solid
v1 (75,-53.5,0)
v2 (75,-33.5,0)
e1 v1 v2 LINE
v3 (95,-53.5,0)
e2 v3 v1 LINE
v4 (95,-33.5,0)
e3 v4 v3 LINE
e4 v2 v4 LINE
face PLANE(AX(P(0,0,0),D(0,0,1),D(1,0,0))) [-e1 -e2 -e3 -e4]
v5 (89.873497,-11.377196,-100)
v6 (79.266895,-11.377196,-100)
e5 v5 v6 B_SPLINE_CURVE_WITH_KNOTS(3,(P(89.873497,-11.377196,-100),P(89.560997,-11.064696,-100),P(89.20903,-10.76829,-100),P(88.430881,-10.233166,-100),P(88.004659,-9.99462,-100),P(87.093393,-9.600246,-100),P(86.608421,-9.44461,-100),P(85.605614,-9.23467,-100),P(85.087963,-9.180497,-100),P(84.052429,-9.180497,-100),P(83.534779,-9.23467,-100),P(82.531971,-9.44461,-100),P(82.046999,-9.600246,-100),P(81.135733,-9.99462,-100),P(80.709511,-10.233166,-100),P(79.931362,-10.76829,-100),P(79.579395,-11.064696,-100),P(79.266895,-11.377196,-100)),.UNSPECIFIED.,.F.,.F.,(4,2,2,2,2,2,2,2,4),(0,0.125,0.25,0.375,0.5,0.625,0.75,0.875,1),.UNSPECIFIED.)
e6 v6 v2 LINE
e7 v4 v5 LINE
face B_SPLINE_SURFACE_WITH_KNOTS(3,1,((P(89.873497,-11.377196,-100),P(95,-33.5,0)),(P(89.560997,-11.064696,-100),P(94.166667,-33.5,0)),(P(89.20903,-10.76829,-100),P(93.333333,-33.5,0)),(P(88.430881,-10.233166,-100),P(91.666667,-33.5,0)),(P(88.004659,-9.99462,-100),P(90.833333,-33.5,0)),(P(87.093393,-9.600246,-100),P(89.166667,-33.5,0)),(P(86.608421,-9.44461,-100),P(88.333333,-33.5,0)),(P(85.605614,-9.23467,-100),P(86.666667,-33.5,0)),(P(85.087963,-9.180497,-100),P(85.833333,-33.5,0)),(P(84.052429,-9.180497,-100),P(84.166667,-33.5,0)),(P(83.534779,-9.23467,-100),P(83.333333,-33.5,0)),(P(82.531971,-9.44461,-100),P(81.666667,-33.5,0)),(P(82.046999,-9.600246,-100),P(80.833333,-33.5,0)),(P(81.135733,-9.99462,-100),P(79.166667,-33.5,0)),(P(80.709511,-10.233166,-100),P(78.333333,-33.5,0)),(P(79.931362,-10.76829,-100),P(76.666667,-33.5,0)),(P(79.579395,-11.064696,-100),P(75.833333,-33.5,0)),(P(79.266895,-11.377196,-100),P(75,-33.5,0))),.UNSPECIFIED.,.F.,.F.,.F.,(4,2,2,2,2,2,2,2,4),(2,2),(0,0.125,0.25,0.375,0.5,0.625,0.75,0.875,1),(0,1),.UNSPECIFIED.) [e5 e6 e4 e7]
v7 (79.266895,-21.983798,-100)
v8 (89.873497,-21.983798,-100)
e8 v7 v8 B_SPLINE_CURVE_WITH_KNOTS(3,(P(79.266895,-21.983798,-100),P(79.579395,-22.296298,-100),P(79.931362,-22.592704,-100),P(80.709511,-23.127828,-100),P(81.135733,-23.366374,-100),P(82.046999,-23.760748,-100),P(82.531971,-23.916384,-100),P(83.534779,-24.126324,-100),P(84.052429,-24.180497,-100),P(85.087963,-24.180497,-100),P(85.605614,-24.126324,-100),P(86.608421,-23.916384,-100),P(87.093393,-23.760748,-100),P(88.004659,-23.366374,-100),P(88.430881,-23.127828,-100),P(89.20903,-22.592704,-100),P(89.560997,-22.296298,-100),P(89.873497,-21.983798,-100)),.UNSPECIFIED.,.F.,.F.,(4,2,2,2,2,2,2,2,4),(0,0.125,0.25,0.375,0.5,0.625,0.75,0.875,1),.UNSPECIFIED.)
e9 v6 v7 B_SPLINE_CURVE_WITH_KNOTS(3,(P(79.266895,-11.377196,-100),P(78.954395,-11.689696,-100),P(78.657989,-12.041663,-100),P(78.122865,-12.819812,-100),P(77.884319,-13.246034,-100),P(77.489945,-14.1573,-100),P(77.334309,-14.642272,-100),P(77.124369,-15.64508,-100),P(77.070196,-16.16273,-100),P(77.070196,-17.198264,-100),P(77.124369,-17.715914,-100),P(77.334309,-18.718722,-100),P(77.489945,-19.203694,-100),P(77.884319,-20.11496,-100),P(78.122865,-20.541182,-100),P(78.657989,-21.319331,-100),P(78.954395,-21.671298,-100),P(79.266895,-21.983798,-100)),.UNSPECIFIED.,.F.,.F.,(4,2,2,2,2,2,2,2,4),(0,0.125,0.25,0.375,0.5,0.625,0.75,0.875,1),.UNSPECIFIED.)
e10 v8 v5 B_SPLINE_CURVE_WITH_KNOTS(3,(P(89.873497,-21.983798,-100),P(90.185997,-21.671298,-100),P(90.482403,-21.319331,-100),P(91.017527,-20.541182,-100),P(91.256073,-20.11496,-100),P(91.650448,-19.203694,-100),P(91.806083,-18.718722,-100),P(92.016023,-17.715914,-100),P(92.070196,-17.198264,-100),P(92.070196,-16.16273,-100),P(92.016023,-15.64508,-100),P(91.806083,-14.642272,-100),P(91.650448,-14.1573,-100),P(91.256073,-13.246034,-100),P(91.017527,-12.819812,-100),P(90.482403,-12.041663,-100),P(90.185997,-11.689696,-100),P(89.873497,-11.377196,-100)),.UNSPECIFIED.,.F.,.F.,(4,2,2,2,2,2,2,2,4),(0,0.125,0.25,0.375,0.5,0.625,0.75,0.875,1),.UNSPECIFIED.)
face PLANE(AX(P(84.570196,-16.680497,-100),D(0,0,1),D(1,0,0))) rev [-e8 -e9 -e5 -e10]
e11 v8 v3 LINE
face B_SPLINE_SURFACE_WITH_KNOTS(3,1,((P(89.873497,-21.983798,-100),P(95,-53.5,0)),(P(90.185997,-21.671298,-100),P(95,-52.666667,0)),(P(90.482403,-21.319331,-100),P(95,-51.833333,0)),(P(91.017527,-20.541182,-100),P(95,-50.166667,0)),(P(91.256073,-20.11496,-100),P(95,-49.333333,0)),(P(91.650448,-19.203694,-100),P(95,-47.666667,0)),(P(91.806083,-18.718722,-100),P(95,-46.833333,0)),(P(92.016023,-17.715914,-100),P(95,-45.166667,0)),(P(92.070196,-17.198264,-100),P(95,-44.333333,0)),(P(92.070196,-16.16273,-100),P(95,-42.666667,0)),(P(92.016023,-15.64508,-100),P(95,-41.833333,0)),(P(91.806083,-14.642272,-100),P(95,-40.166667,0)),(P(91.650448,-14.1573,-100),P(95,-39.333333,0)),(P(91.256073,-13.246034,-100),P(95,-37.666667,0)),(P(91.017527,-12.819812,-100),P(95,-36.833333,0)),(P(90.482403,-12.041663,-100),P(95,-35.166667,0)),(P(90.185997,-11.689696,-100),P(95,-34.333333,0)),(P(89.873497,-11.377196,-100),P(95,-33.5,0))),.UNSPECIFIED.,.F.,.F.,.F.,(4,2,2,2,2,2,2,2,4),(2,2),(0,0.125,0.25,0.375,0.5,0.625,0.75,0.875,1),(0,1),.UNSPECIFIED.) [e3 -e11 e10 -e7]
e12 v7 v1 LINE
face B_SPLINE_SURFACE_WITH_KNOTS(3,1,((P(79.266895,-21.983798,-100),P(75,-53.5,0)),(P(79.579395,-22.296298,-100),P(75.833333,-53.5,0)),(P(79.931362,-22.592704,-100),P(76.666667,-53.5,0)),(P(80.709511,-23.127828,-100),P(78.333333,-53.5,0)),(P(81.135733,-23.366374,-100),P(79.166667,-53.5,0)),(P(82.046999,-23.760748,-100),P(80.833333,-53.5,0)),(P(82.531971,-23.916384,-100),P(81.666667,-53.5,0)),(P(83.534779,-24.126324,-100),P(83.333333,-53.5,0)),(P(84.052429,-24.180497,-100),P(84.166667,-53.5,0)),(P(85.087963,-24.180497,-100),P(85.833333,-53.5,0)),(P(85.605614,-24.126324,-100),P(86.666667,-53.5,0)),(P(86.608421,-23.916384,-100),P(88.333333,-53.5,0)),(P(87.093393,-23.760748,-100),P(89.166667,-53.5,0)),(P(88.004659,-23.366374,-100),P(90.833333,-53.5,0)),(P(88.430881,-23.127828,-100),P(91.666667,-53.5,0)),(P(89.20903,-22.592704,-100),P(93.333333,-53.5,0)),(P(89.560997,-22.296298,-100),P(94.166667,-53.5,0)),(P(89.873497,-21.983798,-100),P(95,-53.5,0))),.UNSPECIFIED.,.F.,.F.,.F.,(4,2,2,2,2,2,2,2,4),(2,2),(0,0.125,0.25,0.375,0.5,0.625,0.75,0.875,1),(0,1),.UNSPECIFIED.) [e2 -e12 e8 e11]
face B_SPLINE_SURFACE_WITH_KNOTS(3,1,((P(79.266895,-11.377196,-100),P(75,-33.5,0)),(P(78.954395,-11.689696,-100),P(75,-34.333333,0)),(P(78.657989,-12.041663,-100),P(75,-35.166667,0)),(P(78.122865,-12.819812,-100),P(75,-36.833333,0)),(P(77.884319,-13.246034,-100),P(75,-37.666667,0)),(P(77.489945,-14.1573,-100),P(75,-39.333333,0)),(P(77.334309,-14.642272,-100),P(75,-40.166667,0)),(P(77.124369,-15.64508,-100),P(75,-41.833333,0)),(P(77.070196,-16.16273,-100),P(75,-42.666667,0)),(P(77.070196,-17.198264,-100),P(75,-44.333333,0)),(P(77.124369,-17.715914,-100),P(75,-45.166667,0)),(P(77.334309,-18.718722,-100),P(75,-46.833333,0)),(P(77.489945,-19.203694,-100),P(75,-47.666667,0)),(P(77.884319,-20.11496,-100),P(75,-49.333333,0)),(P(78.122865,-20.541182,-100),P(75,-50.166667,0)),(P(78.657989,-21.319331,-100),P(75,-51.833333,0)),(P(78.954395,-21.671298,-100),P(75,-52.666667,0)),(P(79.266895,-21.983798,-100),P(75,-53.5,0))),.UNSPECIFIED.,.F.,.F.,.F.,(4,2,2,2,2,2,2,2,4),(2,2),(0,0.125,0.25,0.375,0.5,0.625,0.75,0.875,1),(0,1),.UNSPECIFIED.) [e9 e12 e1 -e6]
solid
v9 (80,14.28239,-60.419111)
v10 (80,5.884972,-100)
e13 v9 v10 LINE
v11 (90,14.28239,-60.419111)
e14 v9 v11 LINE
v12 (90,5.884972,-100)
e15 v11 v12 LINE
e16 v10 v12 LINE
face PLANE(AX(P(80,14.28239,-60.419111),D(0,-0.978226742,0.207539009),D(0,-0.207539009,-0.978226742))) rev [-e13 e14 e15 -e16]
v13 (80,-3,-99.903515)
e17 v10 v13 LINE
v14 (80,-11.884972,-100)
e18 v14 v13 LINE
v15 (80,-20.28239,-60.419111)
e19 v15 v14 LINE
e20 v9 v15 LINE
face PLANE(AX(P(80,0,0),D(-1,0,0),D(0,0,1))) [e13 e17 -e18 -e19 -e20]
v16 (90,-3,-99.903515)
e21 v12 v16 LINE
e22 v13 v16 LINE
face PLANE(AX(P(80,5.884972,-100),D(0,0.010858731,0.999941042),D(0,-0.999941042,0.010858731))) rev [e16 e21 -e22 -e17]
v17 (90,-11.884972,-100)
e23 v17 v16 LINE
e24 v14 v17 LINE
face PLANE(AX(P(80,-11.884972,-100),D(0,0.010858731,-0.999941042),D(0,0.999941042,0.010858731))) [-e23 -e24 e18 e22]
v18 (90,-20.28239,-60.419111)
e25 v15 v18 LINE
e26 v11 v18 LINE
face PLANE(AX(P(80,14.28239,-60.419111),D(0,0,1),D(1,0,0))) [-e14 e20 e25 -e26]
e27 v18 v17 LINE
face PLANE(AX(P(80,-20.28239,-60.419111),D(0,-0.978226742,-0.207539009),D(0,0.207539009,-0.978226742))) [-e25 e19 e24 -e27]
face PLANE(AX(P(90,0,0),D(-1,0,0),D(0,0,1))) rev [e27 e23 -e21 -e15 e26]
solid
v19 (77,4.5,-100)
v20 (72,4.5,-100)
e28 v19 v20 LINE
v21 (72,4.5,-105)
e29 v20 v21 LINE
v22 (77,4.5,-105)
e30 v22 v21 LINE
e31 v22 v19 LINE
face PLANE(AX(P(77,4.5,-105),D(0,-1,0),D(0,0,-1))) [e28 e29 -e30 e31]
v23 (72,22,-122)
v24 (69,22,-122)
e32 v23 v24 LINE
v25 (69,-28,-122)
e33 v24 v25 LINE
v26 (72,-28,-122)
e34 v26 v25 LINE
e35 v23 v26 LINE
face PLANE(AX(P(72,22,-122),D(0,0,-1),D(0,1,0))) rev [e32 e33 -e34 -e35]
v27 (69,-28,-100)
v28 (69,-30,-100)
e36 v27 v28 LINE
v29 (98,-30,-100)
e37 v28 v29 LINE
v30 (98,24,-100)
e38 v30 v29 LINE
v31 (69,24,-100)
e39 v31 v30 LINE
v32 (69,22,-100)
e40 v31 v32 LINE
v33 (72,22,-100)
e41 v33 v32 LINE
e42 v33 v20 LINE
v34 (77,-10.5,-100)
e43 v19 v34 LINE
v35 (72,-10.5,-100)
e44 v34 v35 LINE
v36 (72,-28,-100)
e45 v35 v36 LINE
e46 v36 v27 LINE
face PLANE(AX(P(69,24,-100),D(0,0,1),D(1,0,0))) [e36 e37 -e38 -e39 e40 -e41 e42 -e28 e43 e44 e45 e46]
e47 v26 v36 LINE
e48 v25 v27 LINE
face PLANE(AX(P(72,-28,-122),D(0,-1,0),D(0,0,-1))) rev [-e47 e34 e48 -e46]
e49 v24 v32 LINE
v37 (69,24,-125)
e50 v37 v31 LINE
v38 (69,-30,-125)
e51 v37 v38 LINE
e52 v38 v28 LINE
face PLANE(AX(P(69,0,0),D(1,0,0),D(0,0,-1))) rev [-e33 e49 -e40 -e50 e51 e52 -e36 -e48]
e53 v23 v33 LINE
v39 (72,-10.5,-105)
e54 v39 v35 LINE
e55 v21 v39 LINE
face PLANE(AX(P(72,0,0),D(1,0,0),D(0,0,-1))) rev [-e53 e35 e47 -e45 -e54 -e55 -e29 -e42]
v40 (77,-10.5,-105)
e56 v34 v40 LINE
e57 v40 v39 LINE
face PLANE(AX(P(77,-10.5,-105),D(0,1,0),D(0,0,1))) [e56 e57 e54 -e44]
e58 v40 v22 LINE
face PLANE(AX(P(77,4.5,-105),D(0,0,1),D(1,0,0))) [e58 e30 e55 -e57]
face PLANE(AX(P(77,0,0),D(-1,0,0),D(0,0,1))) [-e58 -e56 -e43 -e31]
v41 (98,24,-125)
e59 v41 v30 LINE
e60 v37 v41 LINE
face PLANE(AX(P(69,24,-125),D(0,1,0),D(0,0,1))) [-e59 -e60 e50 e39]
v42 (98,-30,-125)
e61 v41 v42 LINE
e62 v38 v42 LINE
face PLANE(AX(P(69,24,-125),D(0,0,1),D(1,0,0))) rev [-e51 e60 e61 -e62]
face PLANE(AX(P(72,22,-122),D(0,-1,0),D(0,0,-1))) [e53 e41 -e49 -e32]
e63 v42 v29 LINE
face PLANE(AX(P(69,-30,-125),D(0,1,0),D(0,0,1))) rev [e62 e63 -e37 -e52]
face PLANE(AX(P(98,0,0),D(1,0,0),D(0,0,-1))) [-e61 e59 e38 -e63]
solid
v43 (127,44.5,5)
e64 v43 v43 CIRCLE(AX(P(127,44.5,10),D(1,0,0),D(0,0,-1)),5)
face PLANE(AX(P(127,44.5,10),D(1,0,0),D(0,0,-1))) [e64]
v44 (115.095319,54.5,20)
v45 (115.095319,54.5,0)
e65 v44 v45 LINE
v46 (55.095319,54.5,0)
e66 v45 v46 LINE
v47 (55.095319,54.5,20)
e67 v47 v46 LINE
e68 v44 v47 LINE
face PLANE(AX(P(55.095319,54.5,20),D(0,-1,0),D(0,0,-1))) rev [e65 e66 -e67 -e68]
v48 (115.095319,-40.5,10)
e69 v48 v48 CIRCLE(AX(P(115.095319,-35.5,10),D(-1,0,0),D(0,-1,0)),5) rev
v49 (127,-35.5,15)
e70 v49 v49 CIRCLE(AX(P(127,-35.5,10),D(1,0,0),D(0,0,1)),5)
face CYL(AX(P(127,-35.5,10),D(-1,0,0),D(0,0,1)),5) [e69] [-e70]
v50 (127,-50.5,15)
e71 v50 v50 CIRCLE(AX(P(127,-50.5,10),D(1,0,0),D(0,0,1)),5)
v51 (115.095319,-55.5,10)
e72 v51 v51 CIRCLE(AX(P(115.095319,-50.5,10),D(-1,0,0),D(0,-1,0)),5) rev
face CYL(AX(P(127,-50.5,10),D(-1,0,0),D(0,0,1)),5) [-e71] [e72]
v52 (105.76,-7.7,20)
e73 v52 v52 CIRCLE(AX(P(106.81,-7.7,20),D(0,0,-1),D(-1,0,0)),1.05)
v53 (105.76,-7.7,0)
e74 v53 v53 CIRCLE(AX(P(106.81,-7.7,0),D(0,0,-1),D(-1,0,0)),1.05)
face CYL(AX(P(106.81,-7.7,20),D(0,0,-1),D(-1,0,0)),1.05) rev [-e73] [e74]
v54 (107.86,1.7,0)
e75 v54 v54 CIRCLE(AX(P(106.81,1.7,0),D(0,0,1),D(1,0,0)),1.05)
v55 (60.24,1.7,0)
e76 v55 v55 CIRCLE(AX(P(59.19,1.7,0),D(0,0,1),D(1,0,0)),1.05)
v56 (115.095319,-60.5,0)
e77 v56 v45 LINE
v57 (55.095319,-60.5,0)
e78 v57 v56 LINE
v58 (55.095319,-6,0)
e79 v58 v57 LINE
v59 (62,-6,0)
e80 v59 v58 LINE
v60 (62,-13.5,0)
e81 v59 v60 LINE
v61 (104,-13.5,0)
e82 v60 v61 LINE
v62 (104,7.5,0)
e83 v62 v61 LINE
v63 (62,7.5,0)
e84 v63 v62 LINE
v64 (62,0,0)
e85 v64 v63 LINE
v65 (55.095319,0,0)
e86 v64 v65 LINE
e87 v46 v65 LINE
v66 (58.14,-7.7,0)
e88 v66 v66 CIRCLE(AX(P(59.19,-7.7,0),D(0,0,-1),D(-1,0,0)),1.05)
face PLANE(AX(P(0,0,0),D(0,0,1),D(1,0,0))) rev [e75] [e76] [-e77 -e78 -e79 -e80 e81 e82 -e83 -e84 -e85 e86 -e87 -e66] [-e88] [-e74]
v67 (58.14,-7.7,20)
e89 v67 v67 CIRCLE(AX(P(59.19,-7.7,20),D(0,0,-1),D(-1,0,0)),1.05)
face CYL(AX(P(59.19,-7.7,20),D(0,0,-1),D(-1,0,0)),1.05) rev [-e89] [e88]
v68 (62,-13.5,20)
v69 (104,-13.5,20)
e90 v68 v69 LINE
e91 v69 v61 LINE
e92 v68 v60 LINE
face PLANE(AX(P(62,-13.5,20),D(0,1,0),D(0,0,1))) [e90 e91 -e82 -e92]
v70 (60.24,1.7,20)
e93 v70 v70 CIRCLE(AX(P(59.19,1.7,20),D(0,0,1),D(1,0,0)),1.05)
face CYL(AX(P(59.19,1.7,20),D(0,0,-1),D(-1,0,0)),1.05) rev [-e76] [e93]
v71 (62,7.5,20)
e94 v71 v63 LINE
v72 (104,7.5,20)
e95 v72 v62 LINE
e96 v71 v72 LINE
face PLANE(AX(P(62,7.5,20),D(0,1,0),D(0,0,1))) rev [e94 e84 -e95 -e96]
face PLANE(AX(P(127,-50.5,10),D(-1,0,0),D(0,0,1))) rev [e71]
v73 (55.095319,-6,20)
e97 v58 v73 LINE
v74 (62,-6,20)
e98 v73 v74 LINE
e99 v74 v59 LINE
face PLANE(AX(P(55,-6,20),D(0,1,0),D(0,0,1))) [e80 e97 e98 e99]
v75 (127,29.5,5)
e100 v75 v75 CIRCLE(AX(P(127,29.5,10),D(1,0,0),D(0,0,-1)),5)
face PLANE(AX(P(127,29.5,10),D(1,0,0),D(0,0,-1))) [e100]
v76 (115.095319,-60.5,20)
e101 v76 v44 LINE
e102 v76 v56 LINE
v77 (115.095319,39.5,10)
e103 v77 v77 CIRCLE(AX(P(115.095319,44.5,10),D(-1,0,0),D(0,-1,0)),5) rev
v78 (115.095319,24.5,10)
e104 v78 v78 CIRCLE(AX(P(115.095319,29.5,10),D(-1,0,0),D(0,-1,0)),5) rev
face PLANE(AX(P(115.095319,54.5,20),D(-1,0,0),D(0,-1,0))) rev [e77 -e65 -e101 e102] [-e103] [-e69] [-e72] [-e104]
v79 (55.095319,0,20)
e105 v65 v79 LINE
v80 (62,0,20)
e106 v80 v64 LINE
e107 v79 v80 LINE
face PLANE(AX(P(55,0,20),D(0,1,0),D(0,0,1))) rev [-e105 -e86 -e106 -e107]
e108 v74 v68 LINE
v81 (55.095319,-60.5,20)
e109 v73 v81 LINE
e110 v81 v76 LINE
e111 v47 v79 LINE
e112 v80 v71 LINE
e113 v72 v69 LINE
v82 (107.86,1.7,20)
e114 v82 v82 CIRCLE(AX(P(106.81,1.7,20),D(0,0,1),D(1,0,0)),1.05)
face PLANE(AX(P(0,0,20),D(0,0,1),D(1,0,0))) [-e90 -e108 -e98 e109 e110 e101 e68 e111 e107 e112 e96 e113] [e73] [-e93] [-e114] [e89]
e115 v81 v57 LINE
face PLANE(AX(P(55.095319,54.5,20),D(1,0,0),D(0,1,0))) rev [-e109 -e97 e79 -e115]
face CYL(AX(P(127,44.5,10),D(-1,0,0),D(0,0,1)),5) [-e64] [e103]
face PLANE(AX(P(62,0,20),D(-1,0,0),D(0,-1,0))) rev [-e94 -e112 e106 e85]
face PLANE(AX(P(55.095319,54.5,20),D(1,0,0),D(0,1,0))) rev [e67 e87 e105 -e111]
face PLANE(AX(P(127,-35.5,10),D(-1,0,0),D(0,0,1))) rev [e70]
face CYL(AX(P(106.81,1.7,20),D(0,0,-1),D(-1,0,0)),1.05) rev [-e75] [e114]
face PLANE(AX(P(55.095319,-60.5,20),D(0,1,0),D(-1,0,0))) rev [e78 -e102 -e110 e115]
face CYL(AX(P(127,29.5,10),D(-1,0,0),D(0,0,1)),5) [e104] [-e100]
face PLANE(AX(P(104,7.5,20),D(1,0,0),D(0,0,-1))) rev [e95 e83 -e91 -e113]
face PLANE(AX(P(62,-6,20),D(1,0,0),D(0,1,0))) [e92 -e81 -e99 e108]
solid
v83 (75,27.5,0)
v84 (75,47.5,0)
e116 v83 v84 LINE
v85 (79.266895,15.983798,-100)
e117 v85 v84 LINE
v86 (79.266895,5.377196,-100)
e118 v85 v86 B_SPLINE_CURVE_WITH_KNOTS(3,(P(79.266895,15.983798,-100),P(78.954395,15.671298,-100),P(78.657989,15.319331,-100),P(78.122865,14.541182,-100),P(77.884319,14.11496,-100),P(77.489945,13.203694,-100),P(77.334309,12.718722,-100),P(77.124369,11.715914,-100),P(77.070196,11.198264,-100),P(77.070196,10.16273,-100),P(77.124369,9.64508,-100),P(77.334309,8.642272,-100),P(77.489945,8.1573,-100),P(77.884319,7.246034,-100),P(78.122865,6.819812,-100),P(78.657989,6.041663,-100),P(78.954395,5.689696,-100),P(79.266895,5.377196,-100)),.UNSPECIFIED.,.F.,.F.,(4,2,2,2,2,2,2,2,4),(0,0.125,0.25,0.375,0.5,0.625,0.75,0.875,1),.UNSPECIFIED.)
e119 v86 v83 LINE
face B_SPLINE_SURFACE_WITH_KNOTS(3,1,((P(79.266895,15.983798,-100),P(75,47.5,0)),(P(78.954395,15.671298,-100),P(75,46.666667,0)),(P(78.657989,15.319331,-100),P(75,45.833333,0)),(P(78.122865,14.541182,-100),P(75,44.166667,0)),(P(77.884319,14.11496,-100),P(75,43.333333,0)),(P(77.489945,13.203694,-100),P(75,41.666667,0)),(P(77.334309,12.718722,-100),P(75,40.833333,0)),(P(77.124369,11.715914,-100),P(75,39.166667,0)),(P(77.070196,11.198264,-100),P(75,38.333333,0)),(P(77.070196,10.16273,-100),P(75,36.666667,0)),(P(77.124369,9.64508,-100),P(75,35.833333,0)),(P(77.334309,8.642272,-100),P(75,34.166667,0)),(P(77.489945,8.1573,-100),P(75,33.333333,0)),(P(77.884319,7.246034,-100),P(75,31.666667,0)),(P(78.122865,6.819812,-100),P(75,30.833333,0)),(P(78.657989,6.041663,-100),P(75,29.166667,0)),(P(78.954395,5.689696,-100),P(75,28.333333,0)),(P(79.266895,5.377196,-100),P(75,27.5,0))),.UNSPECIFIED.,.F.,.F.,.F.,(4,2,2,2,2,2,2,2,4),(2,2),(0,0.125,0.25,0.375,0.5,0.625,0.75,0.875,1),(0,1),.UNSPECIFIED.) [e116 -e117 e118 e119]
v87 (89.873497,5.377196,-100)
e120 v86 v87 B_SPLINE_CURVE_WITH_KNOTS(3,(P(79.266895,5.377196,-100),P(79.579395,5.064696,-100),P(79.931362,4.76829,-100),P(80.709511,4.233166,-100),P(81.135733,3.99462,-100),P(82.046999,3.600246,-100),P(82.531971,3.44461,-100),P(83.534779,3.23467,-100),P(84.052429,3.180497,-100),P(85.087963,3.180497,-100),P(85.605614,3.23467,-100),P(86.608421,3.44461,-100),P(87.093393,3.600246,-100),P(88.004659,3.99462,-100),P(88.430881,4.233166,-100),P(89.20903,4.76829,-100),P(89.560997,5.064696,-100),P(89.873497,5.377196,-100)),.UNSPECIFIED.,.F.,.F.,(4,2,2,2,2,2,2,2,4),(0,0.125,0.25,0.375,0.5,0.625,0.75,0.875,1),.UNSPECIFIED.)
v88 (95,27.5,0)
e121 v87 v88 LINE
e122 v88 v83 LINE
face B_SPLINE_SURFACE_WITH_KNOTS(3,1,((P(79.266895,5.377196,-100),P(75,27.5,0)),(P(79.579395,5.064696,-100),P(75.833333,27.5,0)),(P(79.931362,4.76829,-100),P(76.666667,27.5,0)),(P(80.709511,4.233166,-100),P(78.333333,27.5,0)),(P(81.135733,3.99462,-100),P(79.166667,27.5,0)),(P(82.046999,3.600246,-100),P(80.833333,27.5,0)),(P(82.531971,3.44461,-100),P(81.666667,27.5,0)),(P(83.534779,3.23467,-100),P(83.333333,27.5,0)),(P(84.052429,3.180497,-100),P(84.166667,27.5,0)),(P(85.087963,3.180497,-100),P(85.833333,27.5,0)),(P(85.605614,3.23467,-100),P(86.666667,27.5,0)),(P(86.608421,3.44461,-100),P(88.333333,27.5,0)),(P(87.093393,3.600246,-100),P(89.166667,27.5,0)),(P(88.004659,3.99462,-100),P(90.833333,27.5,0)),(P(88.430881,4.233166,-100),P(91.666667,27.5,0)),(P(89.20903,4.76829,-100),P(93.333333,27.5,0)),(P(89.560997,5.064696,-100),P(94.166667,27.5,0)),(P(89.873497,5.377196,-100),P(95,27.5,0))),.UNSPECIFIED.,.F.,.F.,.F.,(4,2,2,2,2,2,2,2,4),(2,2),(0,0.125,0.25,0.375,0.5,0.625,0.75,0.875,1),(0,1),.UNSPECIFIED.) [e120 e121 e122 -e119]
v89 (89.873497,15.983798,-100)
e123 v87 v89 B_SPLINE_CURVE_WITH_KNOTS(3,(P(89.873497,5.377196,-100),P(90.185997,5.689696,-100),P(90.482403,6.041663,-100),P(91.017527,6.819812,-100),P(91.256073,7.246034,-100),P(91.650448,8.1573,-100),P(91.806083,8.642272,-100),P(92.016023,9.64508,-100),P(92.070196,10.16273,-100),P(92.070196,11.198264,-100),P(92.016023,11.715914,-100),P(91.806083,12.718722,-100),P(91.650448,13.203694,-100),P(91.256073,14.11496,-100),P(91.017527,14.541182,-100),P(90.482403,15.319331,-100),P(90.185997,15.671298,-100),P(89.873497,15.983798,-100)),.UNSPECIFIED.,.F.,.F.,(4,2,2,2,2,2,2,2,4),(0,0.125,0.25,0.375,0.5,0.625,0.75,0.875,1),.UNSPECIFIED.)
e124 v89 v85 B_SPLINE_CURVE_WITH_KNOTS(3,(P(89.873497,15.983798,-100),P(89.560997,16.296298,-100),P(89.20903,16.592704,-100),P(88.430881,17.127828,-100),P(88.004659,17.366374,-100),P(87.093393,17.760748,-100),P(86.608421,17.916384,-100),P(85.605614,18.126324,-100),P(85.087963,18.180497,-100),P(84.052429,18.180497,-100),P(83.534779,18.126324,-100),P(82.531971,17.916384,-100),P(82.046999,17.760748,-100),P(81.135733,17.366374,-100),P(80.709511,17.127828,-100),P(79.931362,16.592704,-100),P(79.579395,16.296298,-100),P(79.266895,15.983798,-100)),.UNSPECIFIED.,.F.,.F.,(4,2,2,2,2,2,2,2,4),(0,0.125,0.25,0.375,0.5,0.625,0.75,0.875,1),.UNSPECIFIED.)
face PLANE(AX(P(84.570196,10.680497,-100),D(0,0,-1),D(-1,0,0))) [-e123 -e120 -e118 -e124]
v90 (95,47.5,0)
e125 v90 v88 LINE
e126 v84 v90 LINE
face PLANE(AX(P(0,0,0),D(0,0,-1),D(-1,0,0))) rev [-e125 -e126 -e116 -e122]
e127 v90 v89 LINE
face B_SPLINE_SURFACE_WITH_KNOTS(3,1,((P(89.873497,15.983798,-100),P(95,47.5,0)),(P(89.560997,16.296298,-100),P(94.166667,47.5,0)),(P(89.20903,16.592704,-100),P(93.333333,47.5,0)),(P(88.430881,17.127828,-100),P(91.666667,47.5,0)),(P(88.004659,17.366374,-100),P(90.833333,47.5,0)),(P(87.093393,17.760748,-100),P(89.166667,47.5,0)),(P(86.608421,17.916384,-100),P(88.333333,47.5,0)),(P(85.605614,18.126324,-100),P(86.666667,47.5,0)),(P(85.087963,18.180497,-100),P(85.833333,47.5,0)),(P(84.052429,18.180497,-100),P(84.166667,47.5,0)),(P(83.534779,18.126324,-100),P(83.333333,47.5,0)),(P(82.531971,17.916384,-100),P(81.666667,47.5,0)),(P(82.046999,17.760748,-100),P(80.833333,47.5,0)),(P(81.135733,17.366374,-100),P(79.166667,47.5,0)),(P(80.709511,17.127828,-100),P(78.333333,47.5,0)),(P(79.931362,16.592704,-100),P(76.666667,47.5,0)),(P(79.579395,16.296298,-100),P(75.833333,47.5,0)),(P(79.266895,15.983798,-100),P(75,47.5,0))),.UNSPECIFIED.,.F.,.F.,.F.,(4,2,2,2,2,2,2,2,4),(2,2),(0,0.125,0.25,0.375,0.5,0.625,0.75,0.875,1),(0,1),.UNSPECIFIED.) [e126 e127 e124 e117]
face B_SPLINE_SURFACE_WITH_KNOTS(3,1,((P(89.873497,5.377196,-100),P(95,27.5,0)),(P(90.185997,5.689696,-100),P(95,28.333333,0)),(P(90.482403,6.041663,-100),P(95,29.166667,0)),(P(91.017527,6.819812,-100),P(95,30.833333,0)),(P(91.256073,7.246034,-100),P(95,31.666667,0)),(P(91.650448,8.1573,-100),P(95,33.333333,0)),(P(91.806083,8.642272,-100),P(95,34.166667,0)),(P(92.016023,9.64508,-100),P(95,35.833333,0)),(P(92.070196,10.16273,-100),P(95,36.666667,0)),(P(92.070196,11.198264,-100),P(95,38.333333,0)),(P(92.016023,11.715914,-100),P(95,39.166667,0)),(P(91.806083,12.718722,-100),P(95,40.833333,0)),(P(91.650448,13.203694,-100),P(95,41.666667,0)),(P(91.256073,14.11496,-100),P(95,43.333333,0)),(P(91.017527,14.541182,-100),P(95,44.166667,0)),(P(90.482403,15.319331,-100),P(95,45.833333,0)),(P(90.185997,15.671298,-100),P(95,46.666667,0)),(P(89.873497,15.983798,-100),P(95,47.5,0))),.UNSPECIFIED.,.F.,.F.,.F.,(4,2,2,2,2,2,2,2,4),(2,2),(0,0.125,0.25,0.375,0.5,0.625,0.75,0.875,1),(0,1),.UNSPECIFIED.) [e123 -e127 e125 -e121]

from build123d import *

# Parameters (mm, degrees)
SKETCH_5_W            = 60
SKETCH_5_H            = 115
EXTRUDE_2_DEPTH       = 20
SKETCH_1_R            = 1.05
CUT_EXTRUDE_4_DEPTH   = 20
SKETCH_6_R            = 5
EXTRUDE_3_DEPTH       = 12
EXTRUDE_6_DEPTH       = 3
EXTRUDE_6_DEPTH_BACK  = 26
SKETCH_13_W           = 25
SKETCH_13_H           = 54
SKETCH_16_W           = 22
SKETCH_16_H           = 50
CUT_EXTRUDE_9_DEPTH   = 3
SKETCH_17_W           = 5
SKETCH_17_H           = 15
CUT_EXTRUDE_10_DEPTH  = 8
EXTRUDE_13_DEPTH      = 5
EXTRUDE_13_DEPTH_BACK = 5


with BuildPart() as part:
    # 草圖5 → 填料-伸長2 (new body)
    with BuildSketch(Plane.XY):
        with Locations((85.095319229, -3)):
            Rectangle(SKETCH_5_W, SKETCH_5_H)
    extrude(amount=EXTRUDE_2_DEPTH)

    # 草圖1 → 除料-伸長4 (cut)
    with BuildSketch(Plane.XY):
        with Locations((59.19, 1.7)):
            Circle(SKETCH_1_R)
        with Locations((106.81, 1.7)):
            Circle(SKETCH_1_R)
        with Locations(Location((106.81, -7.7, 0), (0, 0, 180))):
            Circle(SKETCH_1_R)
        with Locations(Location((59.19, -7.7, 0), (0, 0, 180))):
            Circle(SKETCH_1_R)
        Polygon((55, -3), (55, 0), (62, 0), (62, 7.5), (104, 7.5), (104, -13.5), (62, -13.5), (62, -6), (55, -6), align=None)
    extrude(amount=CUT_EXTRUDE_4_DEPTH, mode=Mode.SUBTRACT)

    # 草圖6 → 填料-伸長3 (add)
    with BuildSketch(Plane(origin=(115, 0, 0), x_dir=(0, 0, -1), z_dir=(1, 0, 0))):
        with Locations(Location((-10, 44.5, 0), (0, 0, 270))):
            Circle(SKETCH_6_R)
        with Locations(Location((-10, 29.5, 0), (0, 0, 270))):
            Circle(SKETCH_6_R)
        with Locations(Location((-10, -35.5, 0), (0, 0, 180))):
            Circle(SKETCH_6_R)
        with Locations(Location((-10, -50.5, 0), (0, 0, 180))):
            Circle(SKETCH_6_R)
    extrude(amount=EXTRUDE_3_DEPTH)


with BuildPart() as body_2:
    # 草圖13 → 填料-伸長6 (new, two sides: drawn at the far end of the back side and taken through both)
    with BuildSketch(Plane(origin=(95, 0, 0), x_dir=(0, 0, -1), z_dir=(1, 0, 0)).offset(-EXTRUDE_6_DEPTH_BACK)):
        with Locations((112.5, -3)):
            Rectangle(SKETCH_13_W, SKETCH_13_H)
    extrude(amount=EXTRUDE_6_DEPTH + EXTRUDE_6_DEPTH_BACK)

    # 草圖16 → 除料-伸長9 (cut)
    with BuildSketch(Plane(origin=(69, 0, 0), x_dir=(0, 0, -1), z_dir=(1, 0, 0))):
        with Locations((111, -3)):
            Rectangle(SKETCH_16_W, SKETCH_16_H)
    extrude(amount=CUT_EXTRUDE_9_DEPTH, mode=Mode.SUBTRACT)

    # 草圖17 → 除料-伸長10 (cut)
    with BuildSketch(Plane(origin=(69, 0, 0), x_dir=(0, 0, -1), z_dir=(1, 0, 0))):
        with Locations((102.5, -3)):
            Rectangle(SKETCH_17_W, SKETCH_17_H)
    extrude(amount=CUT_EXTRUDE_10_DEPTH, mode=Mode.SUBTRACT)


with BuildPart() as body_3:
    # 草圖21 → 填料-伸長13 (new, two sides: drawn at the far end of the back side and taken through both)
    with BuildSketch(Plane(origin=(85, 0, 0), x_dir=(0, 0, -1), z_dir=(1, 0, 0)).offset(-EXTRUDE_13_DEPTH_BACK)):
        Polygon((60.419110579, 14.282390183), (60.419110579, -20.282390183), (100, -11.88497246), (99.903514788, -3), (100, 5.88497246), align=None)
    extrude(amount=EXTRUDE_13_DEPTH + EXTRUDE_13_DEPTH_BACK)


with BuildPart() as body_4:
    # Knit 1: read off the stored shape, not the designer's step
    # Knit 1: loft between two sections, ruled curve by curve
    knit_1_from = [
        Edge.make_bspline([(79.266895317, 5.377196179, -100), (79.579395317, 5.064696179, -100), (79.931362244, 4.768290315, -100), (80.709511323, 4.233165726, -100), (81.135733214, 3.994620259, -100), (82.046998926, 3.600245646, -100), (82.531971403, 3.444609801, -100), (83.534778832, 3.234670337, -100), (84.052429223, 3.180497037, -100), (85.087963129, 3.180497037, -100), (85.60561352, 3.234670337, -100), (86.608420949, 3.444609801, -100), (87.093393426, 3.600245646, -100), (88.004659138, 3.994620259, -100), (88.430881029, 4.233165726, -100), (89.209030109, 4.768290315, -100), (89.560997035, 5.064696179, -100), (89.873497035, 5.377196179, -100)], [0, 0, 0, 0, 0.125, 0.125, 0.25, 0.25, 0.375, 0.375, 0.5, 0.5, 0.625, 0.625, 0.75, 0.75, 0.875, 0.875, 1, 1, 1, 1], 3),
        Edge.make_bspline([(89.873497035, 5.377196179, -100), (90.185997035, 5.689696179, -100), (90.482402899, 6.041663105, -100), (91.017527488, 6.819812184, -100), (91.256072955, 7.246034075, -100), (91.650447568, 8.157299787, -100), (91.806083413, 8.642272265, -100), (92.016022877, 9.645079694, -100), (92.070196176, 10.162730084, -100), (92.070196176, 11.19826399, -100), (92.016022877, 11.715914381, -100), (91.806083413, 12.71872181, -100), (91.650447568, 13.203694288, -100), (91.256072955, 14.11496, -100), (91.017527488, 14.541181891, -100), (90.482402899, 15.31933097, -100), (90.185997035, 15.671297896, -100), (89.873497035, 15.983797896, -100)], [0, 0, 0, 0, 0.125, 0.125, 0.25, 0.25, 0.375, 0.375, 0.5, 0.5, 0.625, 0.625, 0.75, 0.75, 0.875, 0.875, 1, 1, 1, 1], 3),
        Edge.make_bspline([(79.266895317, 15.983797896, -100), (78.954395317, 15.671297896, -100), (78.657989454, 15.31933097, -100), (78.122864864, 14.541181891, -100), (77.884319398, 14.11496, -100), (77.489944785, 13.203694288, -100), (77.334308939, 12.71872181, -100), (77.124369476, 11.715914381, -100), (77.070196176, 11.19826399, -100), (77.070196176, 10.162730084, -100), (77.124369476, 9.645079694, -100), (77.334308939, 8.642272265, -100), (77.489944785, 8.157299787, -100), (77.884319398, 7.246034075, -100), (78.122864864, 6.819812184, -100), (78.657989454, 6.041663105, -100), (78.954395317, 5.689696179, -100), (79.266895317, 5.377196179, -100)], [0, 0, 0, 0, 0.125, 0.125, 0.25, 0.25, 0.375, 0.375, 0.5, 0.5, 0.625, 0.625, 0.75, 0.75, 0.875, 0.875, 1, 1, 1, 1], 3),
        Edge.make_bspline([(89.873497035, 15.983797896, -100), (89.560997035, 16.296297896, -100), (89.209030109, 16.59270376, -100), (88.430881029, 17.127828349, -100), (88.004659138, 17.366373816, -100), (87.093393426, 17.760748429, -100), (86.608420949, 17.916384274, -100), (85.60561352, 18.126323738, -100), (85.087963129, 18.180497037, -100), (84.052429223, 18.180497037, -100), (83.534778832, 18.126323738, -100), (82.531971403, 17.916384274, -100), (82.046998926, 17.760748429, -100), (81.135733214, 17.366373816, -100), (80.709511323, 17.127828349, -100), (79.931362244, 16.59270376, -100), (79.579395317, 16.296297896, -100), (79.266895317, 15.983797896, -100)], [0, 0, 0, 0, 0.125, 0.125, 0.25, 0.25, 0.375, 0.375, 0.5, 0.5, 0.625, 0.625, 0.75, 0.75, 0.875, 0.875, 1, 1, 1, 1], 3),
    ]
    knit_1_to = [
        Edge.make_bspline([(75, 27.5, 0), (75.833333333, 27.5, 0), (76.666666667, 27.5, 0), (78.333333333, 27.5, 0), (79.166666667, 27.5, 0), (80.833333333, 27.5, 0), (81.666666667, 27.5, 0), (83.333333333, 27.5, 0), (84.166666667, 27.5, 0), (85.833333333, 27.5, 0), (86.666666667, 27.5, 0), (88.333333333, 27.5, 0), (89.166666667, 27.5, 0), (90.833333333, 27.5, 0), (91.666666667, 27.5, 0), (93.333333333, 27.5, 0), (94.166666667, 27.5, 0), (95, 27.5, 0)], [0, 0, 0, 0, 0.125, 0.125, 0.25, 0.25, 0.375, 0.375, 0.5, 0.5, 0.625, 0.625, 0.75, 0.75, 0.875, 0.875, 1, 1, 1, 1], 3),
        Edge.make_bspline([(95, 27.5, 0), (95, 28.333333333, 0), (95, 29.166666667, 0), (95, 30.833333333, 0), (95, 31.666666667, 0), (95, 33.333333333, 0), (95, 34.166666667, 0), (95, 35.833333333, 0), (95, 36.666666667, 0), (95, 38.333333333, 0), (95, 39.166666667, 0), (95, 40.833333333, 0), (95, 41.666666667, 0), (95, 43.333333333, 0), (95, 44.166666667, 0), (95, 45.833333333, 0), (95, 46.666666667, 0), (95, 47.5, 0)], [0, 0, 0, 0, 0.125, 0.125, 0.25, 0.25, 0.375, 0.375, 0.5, 0.5, 0.625, 0.625, 0.75, 0.75, 0.875, 0.875, 1, 1, 1, 1], 3),
        Edge.make_bspline([(75, 47.5, 0), (75, 46.666666667, 0), (75, 45.833333333, 0), (75, 44.166666667, 0), (75, 43.333333333, 0), (75, 41.666666667, 0), (75, 40.833333333, 0), (75, 39.166666667, 0), (75, 38.333333333, 0), (75, 36.666666667, 0), (75, 35.833333333, 0), (75, 34.166666667, 0), (75, 33.333333333, 0), (75, 31.666666667, 0), (75, 30.833333333, 0), (75, 29.166666667, 0), (75, 28.333333333, 0), (75, 27.5, 0)], [0, 0, 0, 0, 0.125, 0.125, 0.25, 0.25, 0.375, 0.375, 0.5, 0.5, 0.625, 0.625, 0.75, 0.75, 0.875, 0.875, 1, 1, 1, 1], 3),
        Edge.make_bspline([(95, 47.5, 0), (94.166666667, 47.5, 0), (93.333333333, 47.5, 0), (91.666666667, 47.5, 0), (90.833333333, 47.5, 0), (89.166666667, 47.5, 0), (88.333333333, 47.5, 0), (86.666666667, 47.5, 0), (85.833333333, 47.5, 0), (84.166666667, 47.5, 0), (83.333333333, 47.5, 0), (81.666666667, 47.5, 0), (80.833333333, 47.5, 0), (79.166666667, 47.5, 0), (78.333333333, 47.5, 0), (76.666666667, 47.5, 0), (75.833333333, 47.5, 0), (75, 47.5, 0)], [0, 0, 0, 0, 0.125, 0.125, 0.25, 0.25, 0.375, 0.375, 0.5, 0.5, 0.625, 0.625, 0.75, 0.75, 0.875, 0.875, 1, 1, 1, 1], 3),
    ]
    knit_1 = Solid(Shell([*[Face.make_surface_from_curves(knit_1_from[k], knit_1_to[k]) for k in range(4)], Face(Wire(knit_1_from)), Face(Wire(knit_1_to))]))
    add(knit_1)


with BuildPart() as body_5:
    # Knit 2: read off the stored shape, not the designer's step
    # Knit 2: loft between two sections, ruled curve by curve
    knit_2_from = [
        Edge.make_bspline([(79.266895317, -21.983797896, -100), (79.579395317, -22.296297896, -100), (79.931362244, -22.59270376, -100), (80.709511323, -23.127828349, -100), (81.135733214, -23.366373816, -100), (82.046998926, -23.760748429, -100), (82.531971403, -23.916384274, -100), (83.534778832, -24.126323738, -100), (84.052429223, -24.180497037, -100), (85.087963129, -24.180497037, -100), (85.60561352, -24.126323738, -100), (86.608420949, -23.916384274, -100), (87.093393426, -23.760748429, -100), (88.004659138, -23.366373816, -100), (88.430881029, -23.127828349, -100), (89.209030109, -22.59270376, -100), (89.560997035, -22.296297896, -100), (89.873497035, -21.983797896, -100)], [0, 0, 0, 0, 0.125, 0.125, 0.25, 0.25, 0.375, 0.375, 0.5, 0.5, 0.625, 0.625, 0.75, 0.75, 0.875, 0.875, 1, 1, 1, 1], 3),
        Edge.make_bspline([(89.873497035, -21.983797896, -100), (90.185997035, -21.671297896, -100), (90.482402899, -21.31933097, -100), (91.017527488, -20.541181891, -100), (91.256072955, -20.11496, -100), (91.650447568, -19.203694288, -100), (91.806083413, -18.71872181, -100), (92.016022877, -17.715914381, -100), (92.070196176, -17.19826399, -100), (92.070196176, -16.162730084, -100), (92.016022877, -15.645079694, -100), (91.806083413, -14.642272265, -100), (91.650447568, -14.157299787, -100), (91.256072955, -13.246034075, -100), (91.017527488, -12.819812184, -100), (90.482402899, -12.041663105, -100), (90.185997035, -11.689696179, -100), (89.873497035, -11.377196179, -100)], [0, 0, 0, 0, 0.125, 0.125, 0.25, 0.25, 0.375, 0.375, 0.5, 0.5, 0.625, 0.625, 0.75, 0.75, 0.875, 0.875, 1, 1, 1, 1], 3),
        Edge.make_bspline([(79.266895317, -11.377196179, -100), (78.954395317, -11.689696179, -100), (78.657989454, -12.041663105, -100), (78.122864864, -12.819812184, -100), (77.884319398, -13.246034075, -100), (77.489944785, -14.157299787, -100), (77.334308939, -14.642272265, -100), (77.124369476, -15.645079694, -100), (77.070196176, -16.162730084, -100), (77.070196176, -17.19826399, -100), (77.124369476, -17.715914381, -100), (77.334308939, -18.71872181, -100), (77.489944785, -19.203694288, -100), (77.884319398, -20.11496, -100), (78.122864864, -20.541181891, -100), (78.657989454, -21.31933097, -100), (78.954395317, -21.671297896, -100), (79.266895317, -21.983797896, -100)], [0, 0, 0, 0, 0.125, 0.125, 0.25, 0.25, 0.375, 0.375, 0.5, 0.5, 0.625, 0.625, 0.75, 0.75, 0.875, 0.875, 1, 1, 1, 1], 3),
        Edge.make_bspline([(89.873497035, -11.377196179, -100), (89.560997035, -11.064696179, -100), (89.209030109, -10.768290315, -100), (88.430881029, -10.233165726, -100), (88.004659138, -9.994620259, -100), (87.093393426, -9.600245646, -100), (86.608420949, -9.444609801, -100), (85.60561352, -9.234670337, -100), (85.087963129, -9.180497037, -100), (84.052429223, -9.180497037, -100), (83.534778832, -9.234670337, -100), (82.531971403, -9.444609801, -100), (82.046998926, -9.600245646, -100), (81.135733214, -9.994620259, -100), (80.709511323, -10.233165726, -100), (79.931362244, -10.768290315, -100), (79.579395317, -11.064696179, -100), (79.266895317, -11.377196179, -100)], [0, 0, 0, 0, 0.125, 0.125, 0.25, 0.25, 0.375, 0.375, 0.5, 0.5, 0.625, 0.625, 0.75, 0.75, 0.875, 0.875, 1, 1, 1, 1], 3),
    ]
    knit_2_to = [
        Edge.make_bspline([(75, -53.5, 0), (75.833333333, -53.5, 0), (76.666666667, -53.5, 0), (78.333333333, -53.5, 0), (79.166666667, -53.5, 0), (80.833333333, -53.5, 0), (81.666666667, -53.5, 0), (83.333333333, -53.5, 0), (84.166666667, -53.5, 0), (85.833333333, -53.5, 0), (86.666666667, -53.5, 0), (88.333333333, -53.5, 0), (89.166666667, -53.5, 0), (90.833333333, -53.5, 0), (91.666666667, -53.5, 0), (93.333333333, -53.5, 0), (94.166666667, -53.5, 0), (95, -53.5, 0)], [0, 0, 0, 0, 0.125, 0.125, 0.25, 0.25, 0.375, 0.375, 0.5, 0.5, 0.625, 0.625, 0.75, 0.75, 0.875, 0.875, 1, 1, 1, 1], 3),
        Edge.make_bspline([(95, -53.5, 0), (95, -52.666666667, 0), (95, -51.833333333, 0), (95, -50.166666667, 0), (95, -49.333333333, 0), (95, -47.666666667, 0), (95, -46.833333333, 0), (95, -45.166666667, 0), (95, -44.333333333, 0), (95, -42.666666667, 0), (95, -41.833333333, 0), (95, -40.166666667, 0), (95, -39.333333333, 0), (95, -37.666666667, 0), (95, -36.833333333, 0), (95, -35.166666667, 0), (95, -34.333333333, 0), (95, -33.5, 0)], [0, 0, 0, 0, 0.125, 0.125, 0.25, 0.25, 0.375, 0.375, 0.5, 0.5, 0.625, 0.625, 0.75, 0.75, 0.875, 0.875, 1, 1, 1, 1], 3),
        Edge.make_bspline([(75, -33.5, 0), (75, -34.333333333, 0), (75, -35.166666667, 0), (75, -36.833333333, 0), (75, -37.666666667, 0), (75, -39.333333333, 0), (75, -40.166666667, 0), (75, -41.833333333, 0), (75, -42.666666667, 0), (75, -44.333333333, 0), (75, -45.166666667, 0), (75, -46.833333333, 0), (75, -47.666666667, 0), (75, -49.333333333, 0), (75, -50.166666667, 0), (75, -51.833333333, 0), (75, -52.666666667, 0), (75, -53.5, 0)], [0, 0, 0, 0, 0.125, 0.125, 0.25, 0.25, 0.375, 0.375, 0.5, 0.5, 0.625, 0.625, 0.75, 0.75, 0.875, 0.875, 1, 1, 1, 1], 3),
        Edge.make_bspline([(95, -33.5, 0), (94.166666667, -33.5, 0), (93.333333333, -33.5, 0), (91.666666667, -33.5, 0), (90.833333333, -33.5, 0), (89.166666667, -33.5, 0), (88.333333333, -33.5, 0), (86.666666667, -33.5, 0), (85.833333333, -33.5, 0), (84.166666667, -33.5, 0), (83.333333333, -33.5, 0), (81.666666667, -33.5, 0), (80.833333333, -33.5, 0), (79.166666667, -33.5, 0), (78.333333333, -33.5, 0), (76.666666667, -33.5, 0), (75.833333333, -33.5, 0), (75, -33.5, 0)], [0, 0, 0, 0, 0.125, 0.125, 0.25, 0.25, 0.375, 0.375, 0.5, 0.5, 0.625, 0.625, 0.75, 0.75, 0.875, 0.875, 1, 1, 1, 1], 3),
    ]
    knit_2 = Solid(Shell([*[Face.make_surface_from_curves(knit_2_from[k], knit_2_to[k]) for k in range(4)], Face(Wire(knit_2_from)), Face(Wire(knit_2_to))]))
    add(knit_2)


solid = Compound([part.part, body_2.part, body_3.part, body_4.part, body_5.part])
